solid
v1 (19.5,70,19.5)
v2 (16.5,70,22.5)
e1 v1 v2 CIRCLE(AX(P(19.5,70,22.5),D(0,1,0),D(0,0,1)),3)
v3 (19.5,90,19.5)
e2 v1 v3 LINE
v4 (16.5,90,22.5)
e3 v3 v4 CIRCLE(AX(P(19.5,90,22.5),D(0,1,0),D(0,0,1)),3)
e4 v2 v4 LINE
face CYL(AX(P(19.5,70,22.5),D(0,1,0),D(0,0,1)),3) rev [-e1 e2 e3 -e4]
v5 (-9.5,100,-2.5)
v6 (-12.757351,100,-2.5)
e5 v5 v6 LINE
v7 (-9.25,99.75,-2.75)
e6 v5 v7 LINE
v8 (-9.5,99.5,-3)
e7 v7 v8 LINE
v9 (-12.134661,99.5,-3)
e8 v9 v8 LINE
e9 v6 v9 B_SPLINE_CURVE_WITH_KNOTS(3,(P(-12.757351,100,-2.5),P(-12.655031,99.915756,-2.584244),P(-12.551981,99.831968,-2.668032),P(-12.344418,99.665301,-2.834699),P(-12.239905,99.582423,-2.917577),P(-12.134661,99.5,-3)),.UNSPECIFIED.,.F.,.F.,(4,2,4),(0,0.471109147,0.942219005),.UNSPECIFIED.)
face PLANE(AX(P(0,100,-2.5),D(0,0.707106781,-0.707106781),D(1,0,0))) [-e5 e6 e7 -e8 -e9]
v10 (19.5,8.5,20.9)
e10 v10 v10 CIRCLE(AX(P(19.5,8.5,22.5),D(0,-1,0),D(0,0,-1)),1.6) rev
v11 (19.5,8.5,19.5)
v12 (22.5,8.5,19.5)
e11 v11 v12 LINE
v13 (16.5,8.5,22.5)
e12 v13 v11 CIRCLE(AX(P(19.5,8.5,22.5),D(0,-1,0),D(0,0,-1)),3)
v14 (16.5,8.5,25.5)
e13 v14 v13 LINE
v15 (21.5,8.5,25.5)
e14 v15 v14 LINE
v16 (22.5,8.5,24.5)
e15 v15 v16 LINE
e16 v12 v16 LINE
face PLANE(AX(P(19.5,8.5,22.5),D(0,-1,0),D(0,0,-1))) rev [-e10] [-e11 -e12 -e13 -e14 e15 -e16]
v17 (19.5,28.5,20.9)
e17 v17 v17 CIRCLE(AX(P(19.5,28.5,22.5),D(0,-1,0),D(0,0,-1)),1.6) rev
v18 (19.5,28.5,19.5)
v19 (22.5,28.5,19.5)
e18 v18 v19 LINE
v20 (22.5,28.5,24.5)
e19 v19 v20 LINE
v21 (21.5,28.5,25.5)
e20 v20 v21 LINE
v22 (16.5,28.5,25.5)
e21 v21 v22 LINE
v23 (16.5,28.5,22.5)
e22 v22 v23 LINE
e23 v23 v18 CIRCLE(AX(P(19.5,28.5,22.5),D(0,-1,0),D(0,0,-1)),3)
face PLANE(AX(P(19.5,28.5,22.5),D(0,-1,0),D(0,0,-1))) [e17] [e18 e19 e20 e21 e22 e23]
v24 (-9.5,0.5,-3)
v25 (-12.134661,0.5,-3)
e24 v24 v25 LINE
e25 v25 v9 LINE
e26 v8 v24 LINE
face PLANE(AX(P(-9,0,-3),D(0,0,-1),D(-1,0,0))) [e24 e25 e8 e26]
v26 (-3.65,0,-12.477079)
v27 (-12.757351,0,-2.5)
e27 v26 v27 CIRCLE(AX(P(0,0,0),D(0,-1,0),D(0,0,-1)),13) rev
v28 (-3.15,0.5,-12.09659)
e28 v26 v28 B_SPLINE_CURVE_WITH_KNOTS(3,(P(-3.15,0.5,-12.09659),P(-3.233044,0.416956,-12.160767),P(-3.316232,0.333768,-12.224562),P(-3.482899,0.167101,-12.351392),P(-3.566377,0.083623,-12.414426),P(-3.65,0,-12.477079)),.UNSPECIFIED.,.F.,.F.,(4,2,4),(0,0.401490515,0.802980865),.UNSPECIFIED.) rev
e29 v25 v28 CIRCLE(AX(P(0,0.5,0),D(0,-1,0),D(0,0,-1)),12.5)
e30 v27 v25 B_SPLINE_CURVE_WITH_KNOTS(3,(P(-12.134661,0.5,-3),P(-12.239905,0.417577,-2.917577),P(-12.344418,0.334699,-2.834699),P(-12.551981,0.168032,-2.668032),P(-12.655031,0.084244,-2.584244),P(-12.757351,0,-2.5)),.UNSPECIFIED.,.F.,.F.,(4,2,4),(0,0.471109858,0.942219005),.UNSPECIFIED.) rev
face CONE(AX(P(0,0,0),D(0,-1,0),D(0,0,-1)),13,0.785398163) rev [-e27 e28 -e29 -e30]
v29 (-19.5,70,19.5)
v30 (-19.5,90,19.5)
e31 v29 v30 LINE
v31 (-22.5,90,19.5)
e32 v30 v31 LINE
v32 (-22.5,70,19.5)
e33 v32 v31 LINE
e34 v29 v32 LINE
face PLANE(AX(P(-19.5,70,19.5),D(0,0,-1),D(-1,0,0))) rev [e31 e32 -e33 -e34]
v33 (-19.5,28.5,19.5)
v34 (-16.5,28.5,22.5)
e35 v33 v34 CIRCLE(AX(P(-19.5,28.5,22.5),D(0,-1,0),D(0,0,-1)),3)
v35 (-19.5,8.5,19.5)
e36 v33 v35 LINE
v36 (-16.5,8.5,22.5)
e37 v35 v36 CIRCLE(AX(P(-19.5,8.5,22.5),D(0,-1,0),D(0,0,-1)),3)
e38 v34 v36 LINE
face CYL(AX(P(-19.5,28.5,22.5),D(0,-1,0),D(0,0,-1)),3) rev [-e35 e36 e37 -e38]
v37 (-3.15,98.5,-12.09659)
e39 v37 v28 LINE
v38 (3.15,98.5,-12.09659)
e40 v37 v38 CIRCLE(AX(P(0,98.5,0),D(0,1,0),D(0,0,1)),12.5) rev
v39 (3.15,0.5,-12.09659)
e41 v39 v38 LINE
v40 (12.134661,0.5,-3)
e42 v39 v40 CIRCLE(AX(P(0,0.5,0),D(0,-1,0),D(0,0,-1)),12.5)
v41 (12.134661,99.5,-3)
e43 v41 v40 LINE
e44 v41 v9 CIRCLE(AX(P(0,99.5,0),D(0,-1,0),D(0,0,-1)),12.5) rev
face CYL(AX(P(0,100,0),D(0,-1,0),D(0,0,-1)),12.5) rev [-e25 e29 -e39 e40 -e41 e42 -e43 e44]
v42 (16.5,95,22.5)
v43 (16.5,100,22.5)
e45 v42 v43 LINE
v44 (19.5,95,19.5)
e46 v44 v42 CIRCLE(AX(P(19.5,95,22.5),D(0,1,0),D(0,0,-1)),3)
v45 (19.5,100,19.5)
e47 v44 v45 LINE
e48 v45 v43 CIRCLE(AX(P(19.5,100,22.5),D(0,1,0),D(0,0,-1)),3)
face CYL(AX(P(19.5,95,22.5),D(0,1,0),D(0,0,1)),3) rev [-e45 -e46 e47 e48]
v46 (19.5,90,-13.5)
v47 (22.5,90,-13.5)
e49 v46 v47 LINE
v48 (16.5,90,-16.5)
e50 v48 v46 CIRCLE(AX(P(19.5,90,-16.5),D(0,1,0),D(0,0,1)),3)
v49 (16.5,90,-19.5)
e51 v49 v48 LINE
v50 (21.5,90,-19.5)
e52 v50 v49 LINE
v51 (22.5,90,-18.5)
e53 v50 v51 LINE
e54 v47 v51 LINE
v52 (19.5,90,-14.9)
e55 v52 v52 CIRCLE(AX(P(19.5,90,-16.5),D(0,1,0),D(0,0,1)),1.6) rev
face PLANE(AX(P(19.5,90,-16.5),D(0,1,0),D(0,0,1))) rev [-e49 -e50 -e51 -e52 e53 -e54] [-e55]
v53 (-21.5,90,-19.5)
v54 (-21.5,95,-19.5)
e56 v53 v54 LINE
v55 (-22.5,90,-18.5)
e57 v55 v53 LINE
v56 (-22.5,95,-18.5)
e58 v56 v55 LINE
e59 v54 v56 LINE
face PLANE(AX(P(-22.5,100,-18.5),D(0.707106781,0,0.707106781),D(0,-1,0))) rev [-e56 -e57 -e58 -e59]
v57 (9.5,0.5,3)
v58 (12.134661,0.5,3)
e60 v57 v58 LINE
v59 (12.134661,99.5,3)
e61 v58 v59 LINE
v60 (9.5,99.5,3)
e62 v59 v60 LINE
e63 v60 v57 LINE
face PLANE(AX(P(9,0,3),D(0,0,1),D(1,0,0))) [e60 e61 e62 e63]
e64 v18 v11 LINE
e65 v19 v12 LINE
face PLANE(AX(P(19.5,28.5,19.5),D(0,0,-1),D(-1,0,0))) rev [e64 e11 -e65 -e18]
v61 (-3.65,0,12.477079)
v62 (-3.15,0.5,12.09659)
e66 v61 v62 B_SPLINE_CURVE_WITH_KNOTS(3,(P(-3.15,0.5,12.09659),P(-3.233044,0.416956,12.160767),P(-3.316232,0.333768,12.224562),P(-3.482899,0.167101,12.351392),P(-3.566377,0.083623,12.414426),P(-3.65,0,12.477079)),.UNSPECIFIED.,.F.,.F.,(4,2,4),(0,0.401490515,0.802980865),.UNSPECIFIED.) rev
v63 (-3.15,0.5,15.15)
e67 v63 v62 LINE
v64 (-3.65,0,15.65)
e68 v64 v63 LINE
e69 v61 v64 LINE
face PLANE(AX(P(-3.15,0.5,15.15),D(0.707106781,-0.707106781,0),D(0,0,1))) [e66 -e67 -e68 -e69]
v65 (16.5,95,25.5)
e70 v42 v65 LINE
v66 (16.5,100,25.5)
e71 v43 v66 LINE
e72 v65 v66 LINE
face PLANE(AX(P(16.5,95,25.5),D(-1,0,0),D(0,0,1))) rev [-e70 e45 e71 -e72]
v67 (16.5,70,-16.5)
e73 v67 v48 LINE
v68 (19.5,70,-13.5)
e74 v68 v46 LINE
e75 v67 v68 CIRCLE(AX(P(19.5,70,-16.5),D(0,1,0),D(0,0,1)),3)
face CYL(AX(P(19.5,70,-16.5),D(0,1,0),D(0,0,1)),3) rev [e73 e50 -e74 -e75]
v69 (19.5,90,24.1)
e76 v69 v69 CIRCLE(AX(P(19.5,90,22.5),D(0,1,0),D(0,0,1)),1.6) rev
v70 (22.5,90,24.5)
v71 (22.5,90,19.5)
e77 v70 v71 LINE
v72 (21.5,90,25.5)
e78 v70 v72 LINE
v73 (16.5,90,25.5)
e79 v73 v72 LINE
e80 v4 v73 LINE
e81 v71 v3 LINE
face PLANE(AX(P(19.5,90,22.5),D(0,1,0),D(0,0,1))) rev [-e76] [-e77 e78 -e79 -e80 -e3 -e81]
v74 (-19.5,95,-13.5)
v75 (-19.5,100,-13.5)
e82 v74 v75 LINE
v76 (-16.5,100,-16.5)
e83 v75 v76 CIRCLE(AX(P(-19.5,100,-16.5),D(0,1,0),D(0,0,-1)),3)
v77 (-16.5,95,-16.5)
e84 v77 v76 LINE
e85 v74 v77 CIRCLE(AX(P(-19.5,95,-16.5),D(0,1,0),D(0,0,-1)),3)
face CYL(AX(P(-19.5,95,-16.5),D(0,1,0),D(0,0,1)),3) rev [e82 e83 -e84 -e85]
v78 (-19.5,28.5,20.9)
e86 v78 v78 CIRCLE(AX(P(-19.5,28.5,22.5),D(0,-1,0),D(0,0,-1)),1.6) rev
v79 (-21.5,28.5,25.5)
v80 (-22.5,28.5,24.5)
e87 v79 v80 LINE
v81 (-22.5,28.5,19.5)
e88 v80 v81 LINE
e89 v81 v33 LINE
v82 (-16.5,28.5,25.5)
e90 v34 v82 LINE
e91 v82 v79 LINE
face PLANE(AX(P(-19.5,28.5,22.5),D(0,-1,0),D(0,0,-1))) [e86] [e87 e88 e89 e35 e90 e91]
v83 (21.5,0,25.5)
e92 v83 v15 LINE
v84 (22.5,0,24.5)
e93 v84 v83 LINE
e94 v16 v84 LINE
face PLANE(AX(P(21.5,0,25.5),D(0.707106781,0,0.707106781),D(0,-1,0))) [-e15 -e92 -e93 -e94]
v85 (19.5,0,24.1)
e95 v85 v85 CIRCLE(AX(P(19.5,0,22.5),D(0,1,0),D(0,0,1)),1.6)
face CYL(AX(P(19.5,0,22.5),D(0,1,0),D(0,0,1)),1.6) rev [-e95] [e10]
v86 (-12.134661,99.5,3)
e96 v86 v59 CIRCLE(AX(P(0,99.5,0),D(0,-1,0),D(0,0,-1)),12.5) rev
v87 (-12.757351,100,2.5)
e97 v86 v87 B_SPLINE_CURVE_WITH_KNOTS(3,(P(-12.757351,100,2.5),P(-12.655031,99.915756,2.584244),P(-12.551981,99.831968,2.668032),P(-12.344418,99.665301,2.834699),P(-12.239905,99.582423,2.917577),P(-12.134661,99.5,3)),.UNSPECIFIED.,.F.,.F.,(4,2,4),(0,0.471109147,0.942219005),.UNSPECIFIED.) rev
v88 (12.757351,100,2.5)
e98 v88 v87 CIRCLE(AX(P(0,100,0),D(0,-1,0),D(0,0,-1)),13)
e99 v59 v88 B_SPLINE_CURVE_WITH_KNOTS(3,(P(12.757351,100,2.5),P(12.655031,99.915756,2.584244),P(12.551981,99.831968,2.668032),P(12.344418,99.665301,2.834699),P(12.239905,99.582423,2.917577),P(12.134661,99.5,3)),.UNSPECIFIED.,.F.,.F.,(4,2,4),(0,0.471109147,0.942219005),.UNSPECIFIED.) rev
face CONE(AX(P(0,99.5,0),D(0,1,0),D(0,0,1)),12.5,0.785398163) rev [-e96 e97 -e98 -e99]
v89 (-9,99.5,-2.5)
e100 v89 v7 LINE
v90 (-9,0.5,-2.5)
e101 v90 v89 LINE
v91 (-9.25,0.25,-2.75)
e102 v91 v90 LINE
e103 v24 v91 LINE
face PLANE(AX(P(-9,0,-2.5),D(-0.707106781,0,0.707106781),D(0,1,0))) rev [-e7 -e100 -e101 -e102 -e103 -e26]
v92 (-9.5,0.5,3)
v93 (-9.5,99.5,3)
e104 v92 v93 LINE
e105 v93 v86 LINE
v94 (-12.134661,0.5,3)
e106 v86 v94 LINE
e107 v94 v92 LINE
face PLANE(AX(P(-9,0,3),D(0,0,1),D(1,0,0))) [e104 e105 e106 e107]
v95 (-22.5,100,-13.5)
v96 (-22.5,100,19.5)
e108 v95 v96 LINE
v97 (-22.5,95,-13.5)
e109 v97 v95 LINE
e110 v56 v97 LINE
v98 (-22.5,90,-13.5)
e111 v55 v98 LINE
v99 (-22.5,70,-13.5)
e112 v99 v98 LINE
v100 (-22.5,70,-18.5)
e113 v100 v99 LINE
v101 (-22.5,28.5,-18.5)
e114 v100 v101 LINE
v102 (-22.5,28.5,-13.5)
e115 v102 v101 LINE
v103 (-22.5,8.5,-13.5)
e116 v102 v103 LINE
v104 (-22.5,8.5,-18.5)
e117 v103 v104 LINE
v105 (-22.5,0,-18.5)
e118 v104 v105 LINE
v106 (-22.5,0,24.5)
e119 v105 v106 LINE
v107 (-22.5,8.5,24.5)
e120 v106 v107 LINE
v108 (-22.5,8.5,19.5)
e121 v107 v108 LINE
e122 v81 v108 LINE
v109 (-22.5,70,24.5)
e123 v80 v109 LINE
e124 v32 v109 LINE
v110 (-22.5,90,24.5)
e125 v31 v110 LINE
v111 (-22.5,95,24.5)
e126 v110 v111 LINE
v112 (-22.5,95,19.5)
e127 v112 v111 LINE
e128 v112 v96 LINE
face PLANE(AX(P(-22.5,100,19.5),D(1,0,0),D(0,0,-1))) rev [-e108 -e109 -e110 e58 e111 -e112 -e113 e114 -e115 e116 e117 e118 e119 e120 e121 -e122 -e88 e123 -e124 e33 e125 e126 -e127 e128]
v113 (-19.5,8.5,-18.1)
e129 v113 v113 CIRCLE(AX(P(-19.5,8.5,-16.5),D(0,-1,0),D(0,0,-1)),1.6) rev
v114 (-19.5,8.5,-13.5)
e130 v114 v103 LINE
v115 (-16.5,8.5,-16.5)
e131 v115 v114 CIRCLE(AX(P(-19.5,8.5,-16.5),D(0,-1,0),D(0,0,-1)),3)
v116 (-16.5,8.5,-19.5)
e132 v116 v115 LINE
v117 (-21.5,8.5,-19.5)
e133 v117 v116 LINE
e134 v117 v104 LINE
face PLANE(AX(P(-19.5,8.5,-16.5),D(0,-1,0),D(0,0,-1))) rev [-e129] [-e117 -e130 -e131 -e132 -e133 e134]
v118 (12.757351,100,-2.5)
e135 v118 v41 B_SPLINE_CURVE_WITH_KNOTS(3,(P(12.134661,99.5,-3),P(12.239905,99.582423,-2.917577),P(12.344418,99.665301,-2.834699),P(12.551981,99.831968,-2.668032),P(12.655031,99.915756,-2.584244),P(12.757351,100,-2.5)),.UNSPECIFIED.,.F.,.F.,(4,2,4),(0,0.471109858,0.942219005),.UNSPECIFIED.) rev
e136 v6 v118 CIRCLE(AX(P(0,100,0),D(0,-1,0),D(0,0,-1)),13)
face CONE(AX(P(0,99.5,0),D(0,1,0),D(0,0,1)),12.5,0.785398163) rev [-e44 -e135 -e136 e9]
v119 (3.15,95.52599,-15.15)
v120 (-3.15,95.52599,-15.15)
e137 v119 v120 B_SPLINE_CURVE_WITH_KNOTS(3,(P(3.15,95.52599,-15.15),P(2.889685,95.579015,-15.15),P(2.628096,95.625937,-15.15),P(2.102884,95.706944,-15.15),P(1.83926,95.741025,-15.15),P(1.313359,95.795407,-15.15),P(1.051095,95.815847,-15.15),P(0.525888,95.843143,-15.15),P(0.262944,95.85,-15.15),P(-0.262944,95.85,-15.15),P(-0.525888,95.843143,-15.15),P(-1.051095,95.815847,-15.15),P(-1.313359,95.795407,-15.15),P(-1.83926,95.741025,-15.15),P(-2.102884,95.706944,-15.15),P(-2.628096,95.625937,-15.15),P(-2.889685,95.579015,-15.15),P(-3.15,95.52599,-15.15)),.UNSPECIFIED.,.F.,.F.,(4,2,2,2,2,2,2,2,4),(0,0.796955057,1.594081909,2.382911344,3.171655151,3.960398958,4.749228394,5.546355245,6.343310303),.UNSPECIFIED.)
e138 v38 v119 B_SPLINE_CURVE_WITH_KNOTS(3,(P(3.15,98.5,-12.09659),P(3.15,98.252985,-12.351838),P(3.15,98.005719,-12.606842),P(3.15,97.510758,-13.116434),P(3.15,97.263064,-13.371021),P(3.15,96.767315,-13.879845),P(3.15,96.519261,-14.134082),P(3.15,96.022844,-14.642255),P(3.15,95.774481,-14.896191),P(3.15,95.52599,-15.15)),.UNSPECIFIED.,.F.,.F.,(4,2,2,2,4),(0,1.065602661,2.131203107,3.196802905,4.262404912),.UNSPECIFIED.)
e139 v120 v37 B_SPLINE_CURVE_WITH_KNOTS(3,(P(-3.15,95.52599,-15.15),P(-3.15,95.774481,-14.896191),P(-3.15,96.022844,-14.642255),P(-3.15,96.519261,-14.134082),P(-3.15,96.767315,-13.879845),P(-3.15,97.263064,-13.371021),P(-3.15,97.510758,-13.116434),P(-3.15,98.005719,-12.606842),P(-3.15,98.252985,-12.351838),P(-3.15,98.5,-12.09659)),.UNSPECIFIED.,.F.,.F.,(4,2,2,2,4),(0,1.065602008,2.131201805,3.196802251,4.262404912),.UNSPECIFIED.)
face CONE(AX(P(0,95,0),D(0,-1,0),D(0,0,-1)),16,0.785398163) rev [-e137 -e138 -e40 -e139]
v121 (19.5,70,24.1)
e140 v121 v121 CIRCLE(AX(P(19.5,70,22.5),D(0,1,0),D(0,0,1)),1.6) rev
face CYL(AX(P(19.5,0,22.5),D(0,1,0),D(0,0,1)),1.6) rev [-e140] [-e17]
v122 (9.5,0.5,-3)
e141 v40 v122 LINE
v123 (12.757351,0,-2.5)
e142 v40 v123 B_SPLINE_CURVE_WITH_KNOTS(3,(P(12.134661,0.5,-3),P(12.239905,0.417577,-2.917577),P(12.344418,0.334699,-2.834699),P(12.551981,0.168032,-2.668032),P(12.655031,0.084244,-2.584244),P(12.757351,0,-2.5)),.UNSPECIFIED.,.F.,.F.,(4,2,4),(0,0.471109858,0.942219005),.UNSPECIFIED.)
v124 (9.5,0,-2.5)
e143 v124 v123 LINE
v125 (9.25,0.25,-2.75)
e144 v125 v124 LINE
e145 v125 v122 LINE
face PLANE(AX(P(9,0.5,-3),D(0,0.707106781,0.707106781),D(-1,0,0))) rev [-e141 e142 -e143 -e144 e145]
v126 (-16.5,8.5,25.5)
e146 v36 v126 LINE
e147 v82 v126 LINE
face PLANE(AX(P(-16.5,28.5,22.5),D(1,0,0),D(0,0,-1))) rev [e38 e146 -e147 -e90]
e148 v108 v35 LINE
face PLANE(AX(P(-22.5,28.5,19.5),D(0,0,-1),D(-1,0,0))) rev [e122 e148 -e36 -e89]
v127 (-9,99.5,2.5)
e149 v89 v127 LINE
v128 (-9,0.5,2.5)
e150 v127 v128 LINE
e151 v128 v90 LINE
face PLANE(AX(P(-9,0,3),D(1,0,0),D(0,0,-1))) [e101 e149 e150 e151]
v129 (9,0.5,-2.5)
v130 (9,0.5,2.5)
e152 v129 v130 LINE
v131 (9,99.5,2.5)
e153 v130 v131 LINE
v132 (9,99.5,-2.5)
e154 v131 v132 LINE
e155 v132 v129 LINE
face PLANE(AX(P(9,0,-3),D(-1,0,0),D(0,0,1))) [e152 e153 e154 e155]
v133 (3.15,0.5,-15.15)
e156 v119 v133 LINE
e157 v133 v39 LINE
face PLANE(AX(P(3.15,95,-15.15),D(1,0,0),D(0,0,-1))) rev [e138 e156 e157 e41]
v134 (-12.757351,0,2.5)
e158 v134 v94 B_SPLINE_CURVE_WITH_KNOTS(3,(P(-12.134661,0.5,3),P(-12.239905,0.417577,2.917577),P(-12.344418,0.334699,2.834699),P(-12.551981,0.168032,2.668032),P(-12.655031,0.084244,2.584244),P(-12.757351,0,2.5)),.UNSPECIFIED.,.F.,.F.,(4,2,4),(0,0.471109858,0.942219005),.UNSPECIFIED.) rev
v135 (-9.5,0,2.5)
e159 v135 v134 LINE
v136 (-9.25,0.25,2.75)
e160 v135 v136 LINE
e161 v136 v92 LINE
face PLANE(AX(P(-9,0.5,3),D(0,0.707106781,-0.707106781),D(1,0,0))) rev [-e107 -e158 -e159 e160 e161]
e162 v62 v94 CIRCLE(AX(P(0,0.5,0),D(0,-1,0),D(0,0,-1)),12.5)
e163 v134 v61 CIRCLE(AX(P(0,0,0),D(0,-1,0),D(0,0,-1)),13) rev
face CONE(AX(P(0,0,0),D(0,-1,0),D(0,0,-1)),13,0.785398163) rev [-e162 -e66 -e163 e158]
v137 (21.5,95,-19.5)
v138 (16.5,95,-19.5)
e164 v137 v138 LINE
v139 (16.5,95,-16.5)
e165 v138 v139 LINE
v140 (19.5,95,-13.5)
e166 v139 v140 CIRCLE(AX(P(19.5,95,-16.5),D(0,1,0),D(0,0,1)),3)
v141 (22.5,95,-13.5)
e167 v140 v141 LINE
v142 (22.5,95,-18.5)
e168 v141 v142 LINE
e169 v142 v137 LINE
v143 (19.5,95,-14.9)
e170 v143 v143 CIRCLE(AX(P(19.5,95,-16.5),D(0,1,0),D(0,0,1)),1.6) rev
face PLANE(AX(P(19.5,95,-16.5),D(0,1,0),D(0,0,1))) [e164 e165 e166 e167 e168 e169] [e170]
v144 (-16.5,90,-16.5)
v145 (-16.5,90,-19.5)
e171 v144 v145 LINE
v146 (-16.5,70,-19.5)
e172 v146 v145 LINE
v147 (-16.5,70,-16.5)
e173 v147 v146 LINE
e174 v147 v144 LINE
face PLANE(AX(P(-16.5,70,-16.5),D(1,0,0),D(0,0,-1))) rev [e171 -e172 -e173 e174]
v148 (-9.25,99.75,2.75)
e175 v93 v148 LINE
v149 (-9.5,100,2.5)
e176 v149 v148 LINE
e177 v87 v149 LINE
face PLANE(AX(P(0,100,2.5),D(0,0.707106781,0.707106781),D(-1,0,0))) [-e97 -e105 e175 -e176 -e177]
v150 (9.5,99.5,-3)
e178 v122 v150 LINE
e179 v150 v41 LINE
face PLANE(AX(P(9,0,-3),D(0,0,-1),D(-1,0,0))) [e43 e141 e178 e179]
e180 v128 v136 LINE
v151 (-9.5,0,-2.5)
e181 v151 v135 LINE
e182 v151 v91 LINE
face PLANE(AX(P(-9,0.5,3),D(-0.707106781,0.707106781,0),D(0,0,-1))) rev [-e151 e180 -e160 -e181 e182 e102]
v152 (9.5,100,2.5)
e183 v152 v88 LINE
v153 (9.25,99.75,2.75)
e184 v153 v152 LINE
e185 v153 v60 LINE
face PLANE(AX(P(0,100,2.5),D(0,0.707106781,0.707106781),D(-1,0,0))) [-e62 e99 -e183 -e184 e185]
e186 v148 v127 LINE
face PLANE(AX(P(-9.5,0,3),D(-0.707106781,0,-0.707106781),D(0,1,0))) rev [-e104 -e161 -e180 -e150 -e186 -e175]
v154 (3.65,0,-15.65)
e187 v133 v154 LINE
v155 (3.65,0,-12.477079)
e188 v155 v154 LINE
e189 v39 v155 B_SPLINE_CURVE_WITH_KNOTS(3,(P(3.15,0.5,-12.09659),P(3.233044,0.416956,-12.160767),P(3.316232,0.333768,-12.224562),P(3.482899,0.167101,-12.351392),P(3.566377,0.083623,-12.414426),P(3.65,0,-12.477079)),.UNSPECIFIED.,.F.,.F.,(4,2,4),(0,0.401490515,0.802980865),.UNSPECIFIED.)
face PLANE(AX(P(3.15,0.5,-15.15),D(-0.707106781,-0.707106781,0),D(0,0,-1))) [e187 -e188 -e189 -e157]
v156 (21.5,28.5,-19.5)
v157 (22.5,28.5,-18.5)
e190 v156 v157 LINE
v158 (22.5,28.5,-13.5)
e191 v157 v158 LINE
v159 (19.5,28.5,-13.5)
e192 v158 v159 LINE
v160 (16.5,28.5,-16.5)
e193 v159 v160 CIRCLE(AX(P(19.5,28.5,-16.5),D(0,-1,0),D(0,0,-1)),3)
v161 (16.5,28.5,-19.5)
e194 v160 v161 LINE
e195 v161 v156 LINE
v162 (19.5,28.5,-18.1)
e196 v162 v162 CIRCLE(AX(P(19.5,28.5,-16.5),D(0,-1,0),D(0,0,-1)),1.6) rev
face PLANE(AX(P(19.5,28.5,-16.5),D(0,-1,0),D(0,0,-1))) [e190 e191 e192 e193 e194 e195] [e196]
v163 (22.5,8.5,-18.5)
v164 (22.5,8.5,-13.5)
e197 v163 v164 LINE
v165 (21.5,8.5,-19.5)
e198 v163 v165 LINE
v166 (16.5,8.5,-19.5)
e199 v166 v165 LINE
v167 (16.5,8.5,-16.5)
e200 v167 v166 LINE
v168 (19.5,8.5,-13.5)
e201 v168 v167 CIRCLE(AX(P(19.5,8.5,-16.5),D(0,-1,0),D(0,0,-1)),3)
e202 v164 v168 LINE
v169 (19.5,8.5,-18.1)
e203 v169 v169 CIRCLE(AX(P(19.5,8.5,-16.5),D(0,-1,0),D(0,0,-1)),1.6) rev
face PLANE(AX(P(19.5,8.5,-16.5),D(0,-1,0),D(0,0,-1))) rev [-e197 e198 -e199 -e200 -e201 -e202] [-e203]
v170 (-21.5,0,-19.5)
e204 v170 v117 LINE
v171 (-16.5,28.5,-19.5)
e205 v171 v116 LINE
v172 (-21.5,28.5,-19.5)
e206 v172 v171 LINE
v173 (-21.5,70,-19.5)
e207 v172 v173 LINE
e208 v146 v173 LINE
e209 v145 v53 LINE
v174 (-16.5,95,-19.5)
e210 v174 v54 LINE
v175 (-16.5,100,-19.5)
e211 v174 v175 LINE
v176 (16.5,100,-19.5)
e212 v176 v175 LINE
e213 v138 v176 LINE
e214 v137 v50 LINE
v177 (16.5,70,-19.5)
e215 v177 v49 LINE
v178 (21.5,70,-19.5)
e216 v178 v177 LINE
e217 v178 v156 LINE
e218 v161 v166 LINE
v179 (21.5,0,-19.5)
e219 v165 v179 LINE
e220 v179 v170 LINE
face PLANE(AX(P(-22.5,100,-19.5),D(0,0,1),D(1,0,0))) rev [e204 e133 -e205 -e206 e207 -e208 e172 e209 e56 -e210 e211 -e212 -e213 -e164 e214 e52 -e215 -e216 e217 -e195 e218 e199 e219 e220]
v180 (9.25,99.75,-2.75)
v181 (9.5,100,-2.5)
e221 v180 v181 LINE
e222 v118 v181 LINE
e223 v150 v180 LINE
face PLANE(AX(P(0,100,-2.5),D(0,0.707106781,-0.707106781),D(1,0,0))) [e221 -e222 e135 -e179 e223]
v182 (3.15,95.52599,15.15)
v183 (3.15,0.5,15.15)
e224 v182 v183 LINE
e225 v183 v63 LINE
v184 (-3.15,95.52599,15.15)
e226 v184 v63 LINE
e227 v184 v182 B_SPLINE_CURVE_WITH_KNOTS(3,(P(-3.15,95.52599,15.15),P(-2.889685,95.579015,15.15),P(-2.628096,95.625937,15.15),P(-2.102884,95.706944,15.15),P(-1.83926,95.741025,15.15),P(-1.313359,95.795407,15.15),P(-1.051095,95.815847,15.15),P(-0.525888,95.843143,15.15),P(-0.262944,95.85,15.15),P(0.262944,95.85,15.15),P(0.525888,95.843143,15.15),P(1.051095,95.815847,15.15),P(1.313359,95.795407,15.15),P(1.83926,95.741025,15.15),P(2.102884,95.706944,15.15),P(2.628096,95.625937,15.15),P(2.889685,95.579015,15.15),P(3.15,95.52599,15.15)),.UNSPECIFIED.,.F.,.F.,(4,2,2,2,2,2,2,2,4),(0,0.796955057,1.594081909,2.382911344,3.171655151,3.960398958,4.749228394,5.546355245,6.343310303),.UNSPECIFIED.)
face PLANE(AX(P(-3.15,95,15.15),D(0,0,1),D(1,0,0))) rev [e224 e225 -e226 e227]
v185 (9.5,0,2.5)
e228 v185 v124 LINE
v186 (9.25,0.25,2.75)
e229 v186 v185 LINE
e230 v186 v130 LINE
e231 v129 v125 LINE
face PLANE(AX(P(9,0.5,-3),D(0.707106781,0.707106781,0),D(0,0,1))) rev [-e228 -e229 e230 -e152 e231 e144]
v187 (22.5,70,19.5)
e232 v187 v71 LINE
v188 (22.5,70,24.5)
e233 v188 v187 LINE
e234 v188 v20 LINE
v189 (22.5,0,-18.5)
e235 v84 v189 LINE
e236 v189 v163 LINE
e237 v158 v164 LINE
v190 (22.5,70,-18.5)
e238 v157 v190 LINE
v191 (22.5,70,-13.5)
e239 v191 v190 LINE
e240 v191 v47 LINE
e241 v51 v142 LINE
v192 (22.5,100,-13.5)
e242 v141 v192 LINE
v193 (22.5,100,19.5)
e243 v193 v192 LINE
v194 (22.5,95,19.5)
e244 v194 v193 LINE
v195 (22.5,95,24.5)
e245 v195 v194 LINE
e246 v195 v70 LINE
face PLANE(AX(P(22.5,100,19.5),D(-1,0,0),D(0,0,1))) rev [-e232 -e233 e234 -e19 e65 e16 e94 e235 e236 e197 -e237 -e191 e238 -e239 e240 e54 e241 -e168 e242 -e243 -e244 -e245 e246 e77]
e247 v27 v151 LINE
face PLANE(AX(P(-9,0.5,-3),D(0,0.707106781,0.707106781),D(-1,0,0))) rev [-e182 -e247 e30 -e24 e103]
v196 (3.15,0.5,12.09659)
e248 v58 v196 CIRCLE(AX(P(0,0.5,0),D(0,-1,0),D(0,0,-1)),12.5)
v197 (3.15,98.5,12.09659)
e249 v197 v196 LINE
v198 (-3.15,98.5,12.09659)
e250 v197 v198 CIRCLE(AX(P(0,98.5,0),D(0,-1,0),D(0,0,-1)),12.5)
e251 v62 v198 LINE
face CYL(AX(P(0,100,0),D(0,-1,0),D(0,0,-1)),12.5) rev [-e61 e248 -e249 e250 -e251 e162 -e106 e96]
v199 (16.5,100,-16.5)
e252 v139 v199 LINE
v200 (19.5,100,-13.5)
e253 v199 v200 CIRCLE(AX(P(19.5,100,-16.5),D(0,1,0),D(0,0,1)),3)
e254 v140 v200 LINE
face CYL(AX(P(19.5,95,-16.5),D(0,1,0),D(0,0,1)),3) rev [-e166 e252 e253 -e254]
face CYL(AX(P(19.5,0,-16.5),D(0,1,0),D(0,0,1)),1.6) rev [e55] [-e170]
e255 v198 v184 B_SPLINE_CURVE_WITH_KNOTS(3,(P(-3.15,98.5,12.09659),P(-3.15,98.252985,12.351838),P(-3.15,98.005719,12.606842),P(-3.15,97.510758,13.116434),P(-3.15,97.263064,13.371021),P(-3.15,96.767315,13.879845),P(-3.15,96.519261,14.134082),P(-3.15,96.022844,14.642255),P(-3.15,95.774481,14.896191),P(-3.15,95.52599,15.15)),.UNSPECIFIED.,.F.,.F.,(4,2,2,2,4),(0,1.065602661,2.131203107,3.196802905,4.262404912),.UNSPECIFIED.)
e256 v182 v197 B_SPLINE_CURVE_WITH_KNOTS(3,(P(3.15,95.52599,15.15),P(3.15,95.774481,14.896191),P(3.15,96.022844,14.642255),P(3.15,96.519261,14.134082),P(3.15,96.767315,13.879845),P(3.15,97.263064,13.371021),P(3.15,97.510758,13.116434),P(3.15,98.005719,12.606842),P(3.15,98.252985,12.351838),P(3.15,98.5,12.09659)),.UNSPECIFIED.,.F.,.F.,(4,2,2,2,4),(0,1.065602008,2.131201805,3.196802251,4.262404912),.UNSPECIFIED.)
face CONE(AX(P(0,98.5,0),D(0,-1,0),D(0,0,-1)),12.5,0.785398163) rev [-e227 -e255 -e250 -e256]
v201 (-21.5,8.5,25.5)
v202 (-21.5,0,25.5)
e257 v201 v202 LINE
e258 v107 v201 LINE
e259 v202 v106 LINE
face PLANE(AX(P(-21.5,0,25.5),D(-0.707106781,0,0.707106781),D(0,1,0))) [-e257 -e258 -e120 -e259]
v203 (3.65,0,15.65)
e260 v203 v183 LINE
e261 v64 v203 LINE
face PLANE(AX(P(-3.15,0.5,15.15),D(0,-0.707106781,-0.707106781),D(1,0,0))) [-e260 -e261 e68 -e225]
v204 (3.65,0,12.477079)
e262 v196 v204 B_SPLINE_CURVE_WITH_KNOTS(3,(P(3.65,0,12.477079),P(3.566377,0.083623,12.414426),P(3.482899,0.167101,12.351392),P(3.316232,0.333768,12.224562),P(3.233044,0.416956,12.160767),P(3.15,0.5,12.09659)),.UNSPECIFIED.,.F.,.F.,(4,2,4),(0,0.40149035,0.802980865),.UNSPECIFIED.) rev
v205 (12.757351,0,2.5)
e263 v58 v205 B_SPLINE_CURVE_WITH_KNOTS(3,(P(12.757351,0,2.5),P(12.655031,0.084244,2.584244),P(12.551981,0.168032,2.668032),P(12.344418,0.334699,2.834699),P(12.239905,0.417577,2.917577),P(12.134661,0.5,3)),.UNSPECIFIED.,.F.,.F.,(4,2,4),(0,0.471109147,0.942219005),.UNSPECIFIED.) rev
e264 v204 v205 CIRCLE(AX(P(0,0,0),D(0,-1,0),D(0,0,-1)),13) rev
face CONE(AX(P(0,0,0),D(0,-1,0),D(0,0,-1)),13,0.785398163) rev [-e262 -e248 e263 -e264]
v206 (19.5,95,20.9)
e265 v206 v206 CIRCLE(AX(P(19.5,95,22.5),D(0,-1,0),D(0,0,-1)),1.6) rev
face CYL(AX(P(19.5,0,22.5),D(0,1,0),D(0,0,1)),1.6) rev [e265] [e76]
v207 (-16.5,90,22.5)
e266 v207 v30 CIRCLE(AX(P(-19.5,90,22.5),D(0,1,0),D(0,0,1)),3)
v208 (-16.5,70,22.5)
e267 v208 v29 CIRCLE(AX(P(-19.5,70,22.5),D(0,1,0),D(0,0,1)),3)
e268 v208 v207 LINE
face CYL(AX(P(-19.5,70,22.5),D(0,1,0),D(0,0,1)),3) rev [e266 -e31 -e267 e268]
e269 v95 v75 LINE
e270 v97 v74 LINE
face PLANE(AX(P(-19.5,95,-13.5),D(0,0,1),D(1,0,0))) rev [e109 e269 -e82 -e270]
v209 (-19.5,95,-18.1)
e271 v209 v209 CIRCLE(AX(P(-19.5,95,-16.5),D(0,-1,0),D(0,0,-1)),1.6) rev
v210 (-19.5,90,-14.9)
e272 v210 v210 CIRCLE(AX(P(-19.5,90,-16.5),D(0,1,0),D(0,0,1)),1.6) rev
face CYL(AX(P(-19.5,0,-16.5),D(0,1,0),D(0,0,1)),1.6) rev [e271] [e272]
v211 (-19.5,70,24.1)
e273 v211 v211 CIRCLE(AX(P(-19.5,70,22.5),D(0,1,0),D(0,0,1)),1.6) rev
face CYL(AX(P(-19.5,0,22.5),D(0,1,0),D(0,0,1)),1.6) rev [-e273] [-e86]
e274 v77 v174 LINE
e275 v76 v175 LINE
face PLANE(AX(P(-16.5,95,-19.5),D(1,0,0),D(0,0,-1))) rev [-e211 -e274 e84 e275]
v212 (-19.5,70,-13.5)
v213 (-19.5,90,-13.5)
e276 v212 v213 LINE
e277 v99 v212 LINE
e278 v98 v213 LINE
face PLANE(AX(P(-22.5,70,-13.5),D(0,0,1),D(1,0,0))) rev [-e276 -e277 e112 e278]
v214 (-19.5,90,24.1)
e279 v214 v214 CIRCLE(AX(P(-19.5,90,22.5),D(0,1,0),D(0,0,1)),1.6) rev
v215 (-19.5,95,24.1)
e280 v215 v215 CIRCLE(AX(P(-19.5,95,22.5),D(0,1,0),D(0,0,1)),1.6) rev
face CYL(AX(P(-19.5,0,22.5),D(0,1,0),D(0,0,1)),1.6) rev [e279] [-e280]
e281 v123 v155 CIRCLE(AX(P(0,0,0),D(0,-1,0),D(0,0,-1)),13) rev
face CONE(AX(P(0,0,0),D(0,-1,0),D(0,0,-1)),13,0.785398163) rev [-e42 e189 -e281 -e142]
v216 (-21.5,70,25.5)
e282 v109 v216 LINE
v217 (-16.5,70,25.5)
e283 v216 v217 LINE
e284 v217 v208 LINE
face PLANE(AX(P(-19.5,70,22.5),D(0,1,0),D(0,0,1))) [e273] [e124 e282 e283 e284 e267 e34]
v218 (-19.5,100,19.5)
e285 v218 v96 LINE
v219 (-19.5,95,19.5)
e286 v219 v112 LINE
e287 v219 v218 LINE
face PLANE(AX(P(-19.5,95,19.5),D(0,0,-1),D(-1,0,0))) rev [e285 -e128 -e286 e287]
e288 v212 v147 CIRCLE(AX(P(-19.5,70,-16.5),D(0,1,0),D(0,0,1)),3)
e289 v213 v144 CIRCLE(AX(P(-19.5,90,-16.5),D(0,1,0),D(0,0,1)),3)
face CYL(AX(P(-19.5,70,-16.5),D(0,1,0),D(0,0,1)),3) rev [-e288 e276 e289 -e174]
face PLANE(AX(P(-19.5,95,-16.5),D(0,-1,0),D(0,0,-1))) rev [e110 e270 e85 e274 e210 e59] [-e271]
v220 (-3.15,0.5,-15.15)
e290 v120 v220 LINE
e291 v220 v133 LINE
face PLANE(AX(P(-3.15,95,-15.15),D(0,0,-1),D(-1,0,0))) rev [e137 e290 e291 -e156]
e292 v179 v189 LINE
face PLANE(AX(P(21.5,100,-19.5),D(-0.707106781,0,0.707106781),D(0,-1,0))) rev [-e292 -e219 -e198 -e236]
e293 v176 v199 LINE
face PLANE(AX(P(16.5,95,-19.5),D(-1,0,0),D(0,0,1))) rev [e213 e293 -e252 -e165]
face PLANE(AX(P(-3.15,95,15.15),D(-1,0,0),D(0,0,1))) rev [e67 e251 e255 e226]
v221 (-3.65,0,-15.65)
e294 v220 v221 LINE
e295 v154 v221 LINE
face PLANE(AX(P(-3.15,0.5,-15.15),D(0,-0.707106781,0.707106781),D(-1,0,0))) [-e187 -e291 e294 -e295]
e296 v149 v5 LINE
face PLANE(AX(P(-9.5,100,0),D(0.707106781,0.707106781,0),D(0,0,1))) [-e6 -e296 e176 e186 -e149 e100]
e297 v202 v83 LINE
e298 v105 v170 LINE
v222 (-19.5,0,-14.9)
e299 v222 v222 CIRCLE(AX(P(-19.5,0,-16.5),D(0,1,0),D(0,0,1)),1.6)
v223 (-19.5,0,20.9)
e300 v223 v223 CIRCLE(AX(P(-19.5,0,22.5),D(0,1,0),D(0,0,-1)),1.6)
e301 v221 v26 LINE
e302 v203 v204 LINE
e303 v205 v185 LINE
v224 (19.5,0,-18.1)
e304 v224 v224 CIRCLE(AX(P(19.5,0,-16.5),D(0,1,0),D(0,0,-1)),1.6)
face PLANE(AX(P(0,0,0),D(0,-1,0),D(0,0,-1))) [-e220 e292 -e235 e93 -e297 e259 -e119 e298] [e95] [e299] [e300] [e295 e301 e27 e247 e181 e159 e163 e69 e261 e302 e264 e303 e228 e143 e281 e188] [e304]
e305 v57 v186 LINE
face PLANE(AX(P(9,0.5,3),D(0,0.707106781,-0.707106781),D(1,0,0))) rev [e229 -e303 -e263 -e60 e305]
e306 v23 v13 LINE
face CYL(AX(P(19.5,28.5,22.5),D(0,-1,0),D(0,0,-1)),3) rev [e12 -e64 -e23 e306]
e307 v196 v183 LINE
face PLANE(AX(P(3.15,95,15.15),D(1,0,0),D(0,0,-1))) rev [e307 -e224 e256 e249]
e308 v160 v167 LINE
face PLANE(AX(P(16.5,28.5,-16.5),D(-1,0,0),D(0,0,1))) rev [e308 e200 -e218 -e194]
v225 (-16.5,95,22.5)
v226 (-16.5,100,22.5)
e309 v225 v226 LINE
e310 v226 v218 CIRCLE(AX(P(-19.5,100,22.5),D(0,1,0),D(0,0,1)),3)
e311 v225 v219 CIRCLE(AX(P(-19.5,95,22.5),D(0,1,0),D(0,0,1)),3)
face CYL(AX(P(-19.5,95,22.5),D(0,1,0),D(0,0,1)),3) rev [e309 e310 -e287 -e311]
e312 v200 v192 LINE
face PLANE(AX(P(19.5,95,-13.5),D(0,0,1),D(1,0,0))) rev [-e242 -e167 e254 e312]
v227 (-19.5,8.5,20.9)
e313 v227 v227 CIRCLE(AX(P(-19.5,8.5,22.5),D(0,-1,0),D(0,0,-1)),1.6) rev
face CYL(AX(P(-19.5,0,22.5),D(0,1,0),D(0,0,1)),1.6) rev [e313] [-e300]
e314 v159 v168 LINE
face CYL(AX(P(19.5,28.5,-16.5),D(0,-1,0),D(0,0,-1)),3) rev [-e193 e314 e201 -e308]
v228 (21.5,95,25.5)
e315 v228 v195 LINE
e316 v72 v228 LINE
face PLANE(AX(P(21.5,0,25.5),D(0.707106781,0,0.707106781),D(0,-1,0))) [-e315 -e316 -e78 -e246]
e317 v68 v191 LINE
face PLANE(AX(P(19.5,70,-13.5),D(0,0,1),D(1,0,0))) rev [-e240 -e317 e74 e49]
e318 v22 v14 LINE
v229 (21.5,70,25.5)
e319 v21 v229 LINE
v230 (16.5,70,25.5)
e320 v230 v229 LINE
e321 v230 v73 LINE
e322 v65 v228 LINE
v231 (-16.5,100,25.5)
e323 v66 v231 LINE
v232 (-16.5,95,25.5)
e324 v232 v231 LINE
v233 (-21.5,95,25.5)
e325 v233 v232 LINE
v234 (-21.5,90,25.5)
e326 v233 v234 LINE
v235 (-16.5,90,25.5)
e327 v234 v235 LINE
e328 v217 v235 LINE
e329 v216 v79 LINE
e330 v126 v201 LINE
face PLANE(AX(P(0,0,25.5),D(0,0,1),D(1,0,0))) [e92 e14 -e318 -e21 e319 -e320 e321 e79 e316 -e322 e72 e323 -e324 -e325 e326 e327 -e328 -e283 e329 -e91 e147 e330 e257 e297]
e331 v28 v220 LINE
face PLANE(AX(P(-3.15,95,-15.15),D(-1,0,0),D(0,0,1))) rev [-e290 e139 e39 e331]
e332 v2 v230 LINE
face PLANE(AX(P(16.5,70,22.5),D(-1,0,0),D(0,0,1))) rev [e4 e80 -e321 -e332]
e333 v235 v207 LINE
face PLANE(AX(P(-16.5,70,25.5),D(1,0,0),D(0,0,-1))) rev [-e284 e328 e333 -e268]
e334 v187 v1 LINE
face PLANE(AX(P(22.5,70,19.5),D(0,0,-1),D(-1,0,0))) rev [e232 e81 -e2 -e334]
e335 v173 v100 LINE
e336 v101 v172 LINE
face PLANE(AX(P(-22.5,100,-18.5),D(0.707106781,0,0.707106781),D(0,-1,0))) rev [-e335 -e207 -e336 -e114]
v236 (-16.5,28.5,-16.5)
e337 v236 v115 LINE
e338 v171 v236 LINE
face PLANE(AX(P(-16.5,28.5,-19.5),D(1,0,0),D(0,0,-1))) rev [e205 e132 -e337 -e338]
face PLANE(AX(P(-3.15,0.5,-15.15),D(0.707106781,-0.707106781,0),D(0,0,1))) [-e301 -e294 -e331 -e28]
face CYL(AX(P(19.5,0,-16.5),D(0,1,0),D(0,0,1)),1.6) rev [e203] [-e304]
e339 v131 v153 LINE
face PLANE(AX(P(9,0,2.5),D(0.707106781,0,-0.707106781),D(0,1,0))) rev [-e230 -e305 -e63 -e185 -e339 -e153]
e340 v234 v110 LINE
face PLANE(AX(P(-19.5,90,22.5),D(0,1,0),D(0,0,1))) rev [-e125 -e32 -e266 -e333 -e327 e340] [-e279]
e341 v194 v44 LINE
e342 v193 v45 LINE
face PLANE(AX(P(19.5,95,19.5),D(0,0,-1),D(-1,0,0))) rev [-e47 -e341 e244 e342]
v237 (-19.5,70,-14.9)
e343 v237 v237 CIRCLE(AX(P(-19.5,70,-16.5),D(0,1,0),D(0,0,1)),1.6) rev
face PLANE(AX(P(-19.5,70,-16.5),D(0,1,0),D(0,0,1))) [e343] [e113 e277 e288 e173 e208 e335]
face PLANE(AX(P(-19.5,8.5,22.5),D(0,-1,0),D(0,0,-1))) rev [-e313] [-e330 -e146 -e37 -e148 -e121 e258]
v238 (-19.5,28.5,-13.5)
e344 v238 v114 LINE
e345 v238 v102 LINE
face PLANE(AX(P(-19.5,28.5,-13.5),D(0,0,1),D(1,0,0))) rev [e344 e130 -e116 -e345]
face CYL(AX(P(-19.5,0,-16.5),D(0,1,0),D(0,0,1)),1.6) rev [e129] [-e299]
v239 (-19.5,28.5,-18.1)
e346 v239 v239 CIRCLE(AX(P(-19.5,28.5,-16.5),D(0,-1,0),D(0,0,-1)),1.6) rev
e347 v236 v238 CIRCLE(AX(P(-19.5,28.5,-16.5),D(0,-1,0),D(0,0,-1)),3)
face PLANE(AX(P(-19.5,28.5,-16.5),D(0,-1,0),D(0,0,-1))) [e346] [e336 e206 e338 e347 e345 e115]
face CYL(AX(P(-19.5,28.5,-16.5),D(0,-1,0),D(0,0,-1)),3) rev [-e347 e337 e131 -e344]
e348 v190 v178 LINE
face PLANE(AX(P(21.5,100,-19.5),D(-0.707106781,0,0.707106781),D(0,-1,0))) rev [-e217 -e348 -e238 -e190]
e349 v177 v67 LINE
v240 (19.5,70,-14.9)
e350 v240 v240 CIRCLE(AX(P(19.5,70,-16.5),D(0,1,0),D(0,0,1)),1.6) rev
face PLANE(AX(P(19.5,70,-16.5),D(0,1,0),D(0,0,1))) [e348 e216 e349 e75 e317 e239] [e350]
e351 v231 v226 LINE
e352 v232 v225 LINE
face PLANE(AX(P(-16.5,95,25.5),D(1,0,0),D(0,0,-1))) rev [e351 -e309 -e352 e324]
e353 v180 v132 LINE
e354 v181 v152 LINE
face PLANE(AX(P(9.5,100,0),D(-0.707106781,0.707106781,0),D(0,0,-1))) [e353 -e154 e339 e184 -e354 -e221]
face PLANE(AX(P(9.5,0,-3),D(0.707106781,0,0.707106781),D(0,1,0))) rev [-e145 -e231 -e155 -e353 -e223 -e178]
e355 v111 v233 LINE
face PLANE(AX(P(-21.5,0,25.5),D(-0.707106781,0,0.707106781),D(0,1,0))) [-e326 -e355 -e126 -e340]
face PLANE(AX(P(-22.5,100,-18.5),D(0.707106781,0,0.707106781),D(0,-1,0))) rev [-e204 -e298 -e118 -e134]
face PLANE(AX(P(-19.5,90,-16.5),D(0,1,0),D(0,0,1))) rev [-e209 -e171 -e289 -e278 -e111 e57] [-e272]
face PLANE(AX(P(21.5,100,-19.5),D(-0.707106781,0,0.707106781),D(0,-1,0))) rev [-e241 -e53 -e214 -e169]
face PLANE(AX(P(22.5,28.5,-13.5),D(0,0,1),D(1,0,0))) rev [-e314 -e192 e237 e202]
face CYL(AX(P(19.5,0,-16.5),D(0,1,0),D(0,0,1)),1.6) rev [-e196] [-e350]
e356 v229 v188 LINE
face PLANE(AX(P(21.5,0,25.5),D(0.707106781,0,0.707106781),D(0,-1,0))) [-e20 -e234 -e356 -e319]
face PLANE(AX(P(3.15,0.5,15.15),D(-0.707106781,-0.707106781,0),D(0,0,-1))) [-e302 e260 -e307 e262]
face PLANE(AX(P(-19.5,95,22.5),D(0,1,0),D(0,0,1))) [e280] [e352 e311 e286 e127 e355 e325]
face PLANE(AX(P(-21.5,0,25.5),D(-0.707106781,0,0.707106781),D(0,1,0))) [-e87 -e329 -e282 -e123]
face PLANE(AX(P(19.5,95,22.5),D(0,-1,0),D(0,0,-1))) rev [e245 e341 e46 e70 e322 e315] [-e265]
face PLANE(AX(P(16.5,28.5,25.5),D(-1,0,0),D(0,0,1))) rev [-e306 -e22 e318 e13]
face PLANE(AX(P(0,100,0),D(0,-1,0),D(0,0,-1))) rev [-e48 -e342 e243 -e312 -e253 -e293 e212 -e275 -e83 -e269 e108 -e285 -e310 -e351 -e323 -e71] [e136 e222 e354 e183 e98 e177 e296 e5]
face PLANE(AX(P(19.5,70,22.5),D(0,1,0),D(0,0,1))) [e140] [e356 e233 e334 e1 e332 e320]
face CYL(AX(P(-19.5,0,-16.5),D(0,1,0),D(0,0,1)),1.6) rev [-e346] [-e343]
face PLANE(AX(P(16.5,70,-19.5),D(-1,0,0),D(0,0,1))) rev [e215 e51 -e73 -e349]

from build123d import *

# Parameters (mm, degrees)
SKETCH_1_W          = 45
SKETCH_1_H          = 39
SKETCH_1_R          = 12.5
EXTRUDE_1_DEPTH     = 100
SKETCH_2_W          = 6
SKETCH_2_H          = 6
EXTRUDE_2_DEPTH     = 100
SKETCH_3_W          = 45
SKETCH_3_H          = 100
EXTRUDE_3_DEPTH     = 6
SKETCH_4_R          = 1.6
CUT_EXTRUDE_1_DEPTH = 106.624334317
CUT_EXTRUDE_2_DEPTH = 5
CUT_EXTRUDE_4_DEPTH = 20
SKETCH_9_W          = 6.3
SKETCH_9_H          = 6.3
CUT_EXTRUDE_5_DEPTH = 95
CUT_EXTRUDE_START   = -20
CUT_EXTRUDE_6_DEPTH = 20
CHAMFER_1_SIZE      = 1
CHAMFER_2_SIZE      = 0.5
CHAMFER_3_SIZE      = 0.5
CHAMFER_4_SIZE      = 3.5


with BuildPart() as part:
    # 草图1 → 凸台-拉伸1 (new body)
    with BuildSketch(Plane(origin=(0, 0, 0), x_dir=(1, 0, 0), z_dir=(0, 1, 0))):
        Rectangle(SKETCH_1_W, SKETCH_1_H)
        with Locations(Location((0, 0, 0), (0, 0, 270))):
            Circle(SKETCH_1_R, mode=Mode.SUBTRACT)
    extrude(amount=EXTRUDE_1_DEPTH)

    # 草图2 → 凸台-拉伸2 (add)
    with BuildSketch(Plane(origin=(0, 100, 0), x_dir=(1, 0, 0), z_dir=(0, 1, 0))):
        with Locations((12, 0)):
            Rectangle(SKETCH_2_W, SKETCH_2_H)
        with Locations((-12, 0)):
            Rectangle(SKETCH_2_W, SKETCH_2_H)
    extrude(amount=-EXTRUDE_2_DEPTH)

    # 草图3 → 凸台-拉伸3 (add)
    with BuildSketch(Plane.XY.offset(19.5)):
        with Locations((0, 50)):
            Rectangle(SKETCH_3_W, SKETCH_3_H)
    extrude(amount=EXTRUDE_3_DEPTH)

    # 草图4 → 切除-拉伸1 (cut, through all)
    with BuildSketch(Plane(origin=(0, 100, 0), x_dir=(1, 0, 0), z_dir=(0, 1, 0))):
        with Locations(Location((-19.5, 16.5, 0), (0, 0, 270))):
            Circle(SKETCH_4_R)
        with Locations(Location((19.5, 16.5, 0), (0, 0, 90))):
            Circle(SKETCH_4_R)
        with Locations(Location((19.5, -22.5, 0), (0, 0, 270))):
            Circle(SKETCH_4_R)
        with Locations(Location((-19.5, -22.5, 0), (0, 0, 90))):
            Circle(SKETCH_4_R)
    extrude(amount=-CUT_EXTRUDE_1_DEPTH, mode=Mode.SUBTRACT)

    # 草图5 → 切除-拉伸2 (cut)
    with BuildSketch(Plane(origin=(0, 100, 0), x_dir=(1, 0, 0), z_dir=(0, 1, 0))):
        with BuildLine():
            Line((-19.5, 13.5), (-22.5, 13.5))
            Line((-22.5, 13.5), (-22.5, 19.5))
            Line((-22.5, 19.5), (-16.5, 19.5))
            Line((-16.5, 19.5), (-16.5, 16.5))
            ThreePointArc((-16.5, 16.5), (-17.378679656, 14.378679656), (-19.5, 13.5))
        make_face()
        with BuildLine():
            Line((22.5, 19.5), (16.5, 19.5))
            Line((16.5, 19.5), (16.5, 16.5))
            ThreePointArc((16.5, 16.5), (17.378679656, 14.378679656), (19.5, 13.5))
            Line((19.5, 13.5), (22.5, 13.5))
            Line((22.5, 13.5), (22.5, 19.5))
        make_face()
        with BuildLine():
            Line((22.5, -19.5), (22.5, -25.5))
            Line((22.5, -25.5), (16.5, -25.5))
            Line((16.5, -25.5), (16.5, -22.5))
            ThreePointArc((16.5, -22.5), (17.378679656, -20.378679656), (19.5, -19.5))
            Line((19.5, -19.5), (22.5, -19.5))
        make_face()
        with BuildLine():
            Line((-22.5, -25.5), (-16.5, -25.5))
            Line((-16.5, -25.5), (-16.5, -22.5))
            ThreePointArc((-16.5, -22.5), (-17.378679656, -20.378679656), (-19.5, -19.5))
            Line((-19.5, -19.5), (-22.5, -19.5))
            Line((-22.5, -19.5), (-22.5, -25.5))
        make_face()
    extrude(amount=-CUT_EXTRUDE_2_DEPTH, mode=Mode.SUBTRACT)

    # 草图8 → 切除-拉伸4 (cut)
    with BuildSketch(Plane(origin=(0, 90, 0), x_dir=(1, 0, 0), z_dir=(0, 1, 0))):
        with BuildLine():
            Line((-22.5, 13.5), (-19.5, 13.5))
            ThreePointArc((-19.5, 13.5), (-17.378679656, 14.378679656), (-16.5, 16.5))
            Line((-16.5, 16.5), (-16.5, 19.5))
            Line((-16.5, 19.5), (-22.5, 19.5))
            Line((-22.5, 19.5), (-22.5, 13.5))
        make_face()
        with BuildLine():
            Line((22.5, 19.5), (16.5, 19.5))
            Line((16.5, 19.5), (16.5, 16.5))
            ThreePointArc((16.5, 16.5), (17.378679656, 14.378679656), (19.5, 13.5))
            Line((19.5, 13.5), (22.5, 13.5))
            Line((22.5, 13.5), (22.5, 19.5))
        make_face()
        with BuildLine():
            Line((-22.5, -25.5), (-16.5, -25.5))
            Line((-16.5, -25.5), (-16.5, -22.5))
            ThreePointArc((-16.5, -22.5), (-17.378679656, -20.378679656), (-19.5, -19.5))
            Line((-19.5, -19.5), (-22.5, -19.5))
            Line((-22.5, -19.5), (-22.5, -25.5))
        make_face()
        with BuildLine():
            Line((16.5, -22.5), (16.5, -25.5))
            Line((16.5, -25.5), (22.5, -25.5))
            Line((22.5, -25.5), (22.5, -19.5))
            Line((22.5, -19.5), (19.5, -19.5))
            ThreePointArc((19.5, -19.5), (17.378679656, -20.378679656), (16.5, -22.5))
        make_face()
    extrude(amount=-CUT_EXTRUDE_4_DEPTH, mode=Mode.SUBTRACT)

    # 草图9 → 切除-拉伸5 (cut)
    with BuildSketch(Plane.XZ):
        with Locations((0, 12)):
            Rectangle(SKETCH_9_W, SKETCH_9_H)
        with Locations((0, -12)):
            Rectangle(SKETCH_9_W, SKETCH_9_H)
    extrude(amount=-CUT_EXTRUDE_5_DEPTH, mode=Mode.SUBTRACT)

    # 草图10 → 切除-拉伸6 (cut)
    with BuildSketch(Plane(origin=(0, 8.5, 0), x_dir=(-1, 0, 0), z_dir=(0, -1, 0)).offset(CUT_EXTRUDE_START)):
        with BuildLine():
            Line((-16.5, 19.5), (-22.5, 19.5))
            Line((-22.5, 19.5), (-22.5, 13.5))
            Line((-22.5, 13.5), (-19.5, 13.5))
            ThreePointArc((-19.5, 13.5), (-17.378679656, 14.378679656), (-16.5, 16.5))
            Line((-16.5, 16.5), (-16.5, 19.5))
        make_face()
        with BuildLine():
            Line((19.5, 13.5), (22.5, 13.5))
            Line((22.5, 13.5), (22.5, 19.5))
            Line((22.5, 19.5), (16.5, 19.5))
            Line((16.5, 19.5), (16.5, 16.5))
            ThreePointArc((16.5, 16.5), (17.378679656, 14.378679656), (19.5, 13.5))
        make_face()
        with BuildLine():
            Line((-16.5, -25.5), (-16.5, -22.5))
            ThreePointArc((-16.5, -22.5), (-17.378679656, -20.378679656), (-19.5, -19.5))
            Line((-19.5, -19.5), (-22.5, -19.5))
            Line((-22.5, -19.5), (-22.5, -25.5))
            Line((-22.5, -25.5), (-16.5, -25.5))
        make_face()
        with BuildLine():
            Line((22.5, -19.5), (19.5, -19.5))
            ThreePointArc((19.5, -19.5), (17.378679656, -20.378679656), (16.5, -22.5))
            Line((16.5, -22.5), (16.5, -25.5))
            Line((16.5, -25.5), (22.5, -25.5))
            Line((22.5, -25.5), (22.5, -19.5))
        make_face()
    extrude(amount=CUT_EXTRUDE_6_DEPTH, mode=Mode.SUBTRACT)

    # 倒角1
    chamfer_1_edges = [part.edges().sort_by_distance(p)[0] for p in [
        (-22.5, 92.5, -19.5),
        (22.5, 92.5, -19.5),
        (-22.5, 49.25, 25.5),
        (22.5, 92.5, 25.5),
        (-22.5, 49.25, -19.5),
        (22.5, 49.25, -19.5),
        (-22.5, 4.25, 25.5),
        (22.5, 49.25, 25.5),
        (-22.5, 4.25, -19.5),
        (22.5, 4.25, -19.5),
        (22.5, 4.25, 25.5),
        (-22.5, 92.5, 25.5),
    ]]
    chamfer(chamfer_1_edges, length=CHAMFER_1_SIZE)

    # 倒角2
    chamfer_2_edges = [part.edges().sort_by_distance(p)[0] for p in [
        (0, 100, -12.5),
        (8.893379874, 0, -8.783950957),
        (10.56733055, 100, 3),
        (10.56733055, 100, -3),
        (9, 100, 0),
        (10.56733055, 0, 3),
        (8.893379874, 0, 8.783950957),
        (9, 0, 0),
        (-8.893379874, 0, -8.783950957),
        (-3.15, 0, -13.623295214),
        (10.56733055, 0, -3),
        (3.15, 0, 13.623295214),
        (0, 0, 15.15),
        (-3.15, 0, 13.623295214),
        (3.15, 0, -13.623295214),
        (0, 0, -15.15),
        (-8.893379874, 0, 8.783950957),
        (0, 100, 12.5),
        (-10.56733055, 100, 3),
        (-9, 100, 0),
        (-10.56733055, 100, -3),
        (-10.56733055, 0, -3),
        (-9, 0, 0),
        (-10.56733055, 0, 3),
    ]]
    chamfer(chamfer_2_edges, length=CHAMFER_2_SIZE)

    # 倒角3
    chamfer_3_edges = [part.edges().sort_by_distance(p)[0] for p in [
        (9, 50, -3),
        (9, 50, 3),
        (-9, 50, 3),
        (-9, 50, -3),
    ]]
    chamfer(chamfer_3_edges, length=CHAMFER_3_SIZE)

    # 倒角4
    # the kernel refuses this chamfer: 3.5 mm, written as the material it takes off along each edge
    with BuildSketch(Plane(origin=(0, 95, 0), x_dir=(0.8276166143248335, 0, 0.5612938087076144), z_dir=(0.5612938087076144, 0, -0.8276166143248335))) as chamfer_4_piece_1_section:
        Polygon((12.5, -CHAMFER_4_SIZE), (12.5 + CHAMFER_4_SIZE, 0), (12.5, 0), align=None)
    chamfer_4_piece_1 = revolve(axis=Axis((0, 95, 0), (0, -1, 0)), revolution_arc=111.709358924, mode=Mode.PRIVATE)
    chamfer_4_piece_1 = split(chamfer_4_piece_1, bisect_by=Plane(origin=(3.15, 96.215607444, 13.411571033), z_dir=(-1, 0, 0)), keep=Keep.TOP, mode=Mode.PRIVATE)
    chamfer_4_piece_1 = split(chamfer_4_piece_1, bisect_by=Plane(origin=(0, 96.215607444, 15.15), z_dir=(0, 0, -1)), keep=Keep.TOP, mode=Mode.PRIVATE)
    chamfer_4_piece_1 = split(chamfer_4_piece_1, bisect_by=Plane(origin=(-3.15, 96.215607444, 13.411571033), z_dir=(1, 0, 0)), keep=Keep.TOP, mode=Mode.PRIVATE)
    add(chamfer_4_piece_1, mode=Mode.SUBTRACT)
    with BuildSketch(Plane(origin=(0, 95, 0), x_dir=(-0.8276166143248334, 0, -0.5612938087076144), z_dir=(-0.5612938087076144, 0, 0.8276166143248334))) as chamfer_4_piece_2_section:
        Polygon((12.5, -CHAMFER_4_SIZE), (12.5 + CHAMFER_4_SIZE, 0), (12.5, 0), align=None)
    chamfer_4_piece_2 = revolve(axis=Axis((0, 95, 0), (0, -1, 0)), revolution_arc=111.709358924, mode=Mode.PRIVATE)
    chamfer_4_piece_2 = split(chamfer_4_piece_2, bisect_by=Plane(origin=(3.15, 96.215607444, -13.411571033), z_dir=(-1, 0, 0)), keep=Keep.TOP, mode=Mode.PRIVATE)
    chamfer_4_piece_2 = split(chamfer_4_piece_2, bisect_by=Plane(origin=(0, 96.215607444, -15.15), z_dir=(0, 0, 1)), keep=Keep.TOP, mode=Mode.PRIVATE)
    chamfer_4_piece_2 = split(chamfer_4_piece_2, bisect_by=Plane(origin=(-3.15, 96.215607444, -13.411571033), z_dir=(1, 0, 0)), keep=Keep.TOP, mode=Mode.PRIVATE)
    add(chamfer_4_piece_2, mode=Mode.SUBTRACT)


solid = part.part
